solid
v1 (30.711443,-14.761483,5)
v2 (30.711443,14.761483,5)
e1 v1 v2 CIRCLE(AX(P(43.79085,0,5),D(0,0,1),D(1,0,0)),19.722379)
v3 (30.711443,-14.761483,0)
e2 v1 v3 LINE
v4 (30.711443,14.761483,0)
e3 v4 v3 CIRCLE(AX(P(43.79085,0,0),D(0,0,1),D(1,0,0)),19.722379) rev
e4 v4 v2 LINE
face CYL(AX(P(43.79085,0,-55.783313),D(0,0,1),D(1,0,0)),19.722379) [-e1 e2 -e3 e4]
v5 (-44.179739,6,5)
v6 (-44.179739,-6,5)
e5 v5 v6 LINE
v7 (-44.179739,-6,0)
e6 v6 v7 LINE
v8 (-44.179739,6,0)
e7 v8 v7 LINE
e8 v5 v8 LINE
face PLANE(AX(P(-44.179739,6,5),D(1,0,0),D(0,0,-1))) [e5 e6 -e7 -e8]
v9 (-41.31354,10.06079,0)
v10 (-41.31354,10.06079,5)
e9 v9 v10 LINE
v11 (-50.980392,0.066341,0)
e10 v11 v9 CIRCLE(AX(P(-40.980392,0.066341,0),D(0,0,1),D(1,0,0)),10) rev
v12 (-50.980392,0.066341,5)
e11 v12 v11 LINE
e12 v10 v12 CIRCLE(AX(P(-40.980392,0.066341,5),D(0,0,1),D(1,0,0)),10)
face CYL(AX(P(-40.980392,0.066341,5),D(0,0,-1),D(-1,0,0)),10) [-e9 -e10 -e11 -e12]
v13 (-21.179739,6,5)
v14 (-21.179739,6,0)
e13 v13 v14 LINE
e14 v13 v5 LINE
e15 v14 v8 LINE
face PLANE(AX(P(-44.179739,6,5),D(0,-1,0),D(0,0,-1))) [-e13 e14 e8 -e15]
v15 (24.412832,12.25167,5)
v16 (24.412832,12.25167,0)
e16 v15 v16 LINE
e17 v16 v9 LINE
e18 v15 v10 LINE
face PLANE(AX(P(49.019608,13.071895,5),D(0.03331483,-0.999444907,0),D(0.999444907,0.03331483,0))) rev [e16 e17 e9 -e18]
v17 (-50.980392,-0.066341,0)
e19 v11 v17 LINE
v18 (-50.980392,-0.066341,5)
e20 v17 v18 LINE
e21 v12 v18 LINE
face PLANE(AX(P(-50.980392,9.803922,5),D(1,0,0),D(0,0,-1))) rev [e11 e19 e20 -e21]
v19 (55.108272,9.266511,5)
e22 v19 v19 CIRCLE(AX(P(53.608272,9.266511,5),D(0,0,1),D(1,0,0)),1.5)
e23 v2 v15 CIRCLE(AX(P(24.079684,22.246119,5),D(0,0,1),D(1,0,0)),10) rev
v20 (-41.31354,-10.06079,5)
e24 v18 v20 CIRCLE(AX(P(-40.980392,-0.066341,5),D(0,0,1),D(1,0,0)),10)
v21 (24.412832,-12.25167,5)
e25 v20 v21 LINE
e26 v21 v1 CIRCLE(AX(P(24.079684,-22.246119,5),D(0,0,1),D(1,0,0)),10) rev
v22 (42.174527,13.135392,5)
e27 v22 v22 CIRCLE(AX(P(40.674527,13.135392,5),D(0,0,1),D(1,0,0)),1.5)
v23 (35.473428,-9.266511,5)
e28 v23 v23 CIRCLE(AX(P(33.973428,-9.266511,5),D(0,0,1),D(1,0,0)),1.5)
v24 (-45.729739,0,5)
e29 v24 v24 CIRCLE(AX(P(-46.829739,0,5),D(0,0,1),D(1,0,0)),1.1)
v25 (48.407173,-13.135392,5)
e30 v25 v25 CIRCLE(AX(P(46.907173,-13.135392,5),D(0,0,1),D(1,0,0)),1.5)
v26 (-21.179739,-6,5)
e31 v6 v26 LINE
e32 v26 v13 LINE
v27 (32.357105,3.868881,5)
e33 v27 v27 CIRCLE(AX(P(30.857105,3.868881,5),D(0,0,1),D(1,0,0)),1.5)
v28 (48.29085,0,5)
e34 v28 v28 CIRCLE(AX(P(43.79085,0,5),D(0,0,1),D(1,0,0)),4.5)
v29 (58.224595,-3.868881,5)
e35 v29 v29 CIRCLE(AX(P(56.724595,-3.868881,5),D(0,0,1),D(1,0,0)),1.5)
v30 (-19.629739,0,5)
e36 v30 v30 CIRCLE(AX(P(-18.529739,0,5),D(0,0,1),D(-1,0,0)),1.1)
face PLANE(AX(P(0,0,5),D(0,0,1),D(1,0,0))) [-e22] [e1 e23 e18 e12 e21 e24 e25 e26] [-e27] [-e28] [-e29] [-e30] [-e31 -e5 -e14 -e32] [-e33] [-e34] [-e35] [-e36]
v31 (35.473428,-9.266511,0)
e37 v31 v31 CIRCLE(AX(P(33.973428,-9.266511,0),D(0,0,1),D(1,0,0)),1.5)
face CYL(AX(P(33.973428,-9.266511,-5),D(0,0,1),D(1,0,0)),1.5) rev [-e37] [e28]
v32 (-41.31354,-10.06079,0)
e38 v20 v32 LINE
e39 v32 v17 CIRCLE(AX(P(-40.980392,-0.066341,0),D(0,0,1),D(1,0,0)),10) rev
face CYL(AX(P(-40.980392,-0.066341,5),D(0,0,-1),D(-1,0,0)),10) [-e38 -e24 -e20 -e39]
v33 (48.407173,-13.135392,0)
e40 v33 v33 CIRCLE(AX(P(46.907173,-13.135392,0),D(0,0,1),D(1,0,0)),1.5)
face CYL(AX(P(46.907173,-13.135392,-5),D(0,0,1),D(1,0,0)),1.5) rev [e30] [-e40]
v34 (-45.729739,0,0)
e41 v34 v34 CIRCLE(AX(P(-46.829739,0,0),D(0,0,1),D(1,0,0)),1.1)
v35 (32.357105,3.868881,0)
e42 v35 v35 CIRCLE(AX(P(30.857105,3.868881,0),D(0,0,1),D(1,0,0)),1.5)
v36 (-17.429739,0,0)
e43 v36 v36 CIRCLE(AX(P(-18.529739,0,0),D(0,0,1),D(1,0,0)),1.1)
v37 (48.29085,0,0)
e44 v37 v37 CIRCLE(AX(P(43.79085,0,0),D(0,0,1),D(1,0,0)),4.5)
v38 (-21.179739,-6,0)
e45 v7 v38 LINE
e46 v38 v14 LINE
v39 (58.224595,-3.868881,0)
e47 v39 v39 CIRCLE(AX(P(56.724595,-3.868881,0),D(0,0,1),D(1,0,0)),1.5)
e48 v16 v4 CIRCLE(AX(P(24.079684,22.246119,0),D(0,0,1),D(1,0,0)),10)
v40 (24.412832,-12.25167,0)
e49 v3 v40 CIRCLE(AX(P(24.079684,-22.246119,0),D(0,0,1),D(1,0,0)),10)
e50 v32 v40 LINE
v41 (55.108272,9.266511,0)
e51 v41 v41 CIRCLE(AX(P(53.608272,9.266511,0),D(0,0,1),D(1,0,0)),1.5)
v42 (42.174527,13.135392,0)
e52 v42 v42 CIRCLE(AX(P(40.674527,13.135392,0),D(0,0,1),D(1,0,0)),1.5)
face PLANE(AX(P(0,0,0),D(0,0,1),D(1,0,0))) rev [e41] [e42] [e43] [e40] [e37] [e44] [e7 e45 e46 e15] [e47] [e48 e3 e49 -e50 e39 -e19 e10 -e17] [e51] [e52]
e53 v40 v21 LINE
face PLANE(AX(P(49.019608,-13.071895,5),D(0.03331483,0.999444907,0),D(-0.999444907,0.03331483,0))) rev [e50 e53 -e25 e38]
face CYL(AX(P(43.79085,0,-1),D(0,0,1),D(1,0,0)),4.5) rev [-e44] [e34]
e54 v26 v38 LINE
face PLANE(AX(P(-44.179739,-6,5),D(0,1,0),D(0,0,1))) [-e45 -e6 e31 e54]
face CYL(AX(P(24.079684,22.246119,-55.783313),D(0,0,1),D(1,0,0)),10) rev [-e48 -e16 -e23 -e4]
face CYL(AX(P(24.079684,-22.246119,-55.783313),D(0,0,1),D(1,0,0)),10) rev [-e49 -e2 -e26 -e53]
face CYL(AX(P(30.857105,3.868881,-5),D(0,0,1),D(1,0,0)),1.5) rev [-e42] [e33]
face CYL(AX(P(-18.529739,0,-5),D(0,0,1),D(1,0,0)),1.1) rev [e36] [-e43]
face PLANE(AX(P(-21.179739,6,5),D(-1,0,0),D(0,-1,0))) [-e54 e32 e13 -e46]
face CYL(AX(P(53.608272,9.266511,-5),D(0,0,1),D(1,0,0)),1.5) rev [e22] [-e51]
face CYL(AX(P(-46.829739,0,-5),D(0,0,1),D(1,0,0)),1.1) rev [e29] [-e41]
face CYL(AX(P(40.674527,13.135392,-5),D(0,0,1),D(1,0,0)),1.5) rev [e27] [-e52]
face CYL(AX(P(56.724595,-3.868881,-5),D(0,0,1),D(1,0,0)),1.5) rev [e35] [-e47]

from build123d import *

# Parameters (mm, degrees)
SKETCH1_R           = 1.960784314
SKETCH1_W           = 23
SKETCH1_H           = 12
BOSS_EXTRUDE1_DEPTH = 5
FILLET2_R           = 20
SKETCH3_R           = 19.722379498
SKETCH3_R_2         = 3
BOSS_EXTRUDE2_DEPTH = 5
FILLET3_R           = 10
SKETCH6_R           = 4.5
CUT_EXTRUDE3_DEPTH  = 6
SKETCH7_R           = 1.5
SKETCH7_R_2         = 4.5
CUT_EXTRUDE4_DEPTH  = 10
SKETCH9_R           = 1.1
CUT_EXTRUDE6_DEPTH  = 10


with BuildPart() as part:
    # Sketch1 → Boss-Extrude1 (new body)
    with BuildSketch(Plane.XY):
        Polygon((49.019607843, 13.071895425), (49.019607843, -13.071895425), (-49.019607843, -9.803921569), (-50.980392157, -9.803921569), (-50.980392157, 9.803921569), (-49.019607843, 9.803921569), align=None)
        with Locations((43.790849673, 0)):
            Circle(SKETCH1_R, mode=Mode.SUBTRACT)
        with Locations((-32.679738562, 0)):
            Rectangle(SKETCH1_W, SKETCH1_H, mode=Mode.SUBTRACT)
    extrude(amount=BOSS_EXTRUDE1_DEPTH)

    # Fillet2
    # the kernel refuses this fillet: 20 mm, written as the material it takes off along each edge
    with BuildSketch(Plane(origin=(49.019607843, -13.071895425, -51.694436733), x_dir=(0, 1, 0), z_dir=(0, 0, 1))) as fillet2_piece_1:
        with BuildLine():
            CenterArc((FILLET2_R * 1.03388873465, FILLET2_R), FILLET2_R, 178.090847567, 91.909152433)
            Line((FILLET2_R * 0.0344438276744, FILLET2_R * 1.03331483023), (0, 0))
            Line((0, 0), (FILLET2_R * 1.03388873465, 0))
        make_face()
    extrude(amount=108.388873465, mode=Mode.SUBTRACT)
    with BuildSketch(Plane(origin=(49.019607843, 13.071895425, -51.694436733), x_dir=(0, -1, 0), z_dir=(0, 0, 1))) as fillet2_piece_2:
        with BuildLine():
            CenterArc((FILLET2_R * 1.03388873465, -FILLET2_R), FILLET2_R, 90, 91.909152433)
            Line((FILLET2_R * 0.0344438276744, -FILLET2_R * 1.03331483023), (0, 0))
            Line((0, 0), (FILLET2_R * 1.03388873465, 0))
        make_face()
    extrude(amount=108.388873465, mode=Mode.SUBTRACT)

    # Sketch3 → Boss-Extrude2 (add)
    with BuildSketch(Plane.XY.offset(5)):
        with Locations((43.790849673, 0)):
            Circle(SKETCH3_R)
        with Locations((43.790849673, 0)):
            Circle(SKETCH3_R_2, mode=Mode.SUBTRACT)
    extrude(amount=-BOSS_EXTRUDE2_DEPTH)

    # Fillet3
    fillet3_edges = [part.edges().sort_by_distance(p)[0] for p in [
        (-50.980392157, 9.803921569, 2.5),
        (-50.980392157, -9.803921569, 2.5),
        (28.442748303, -12.385799828, 2.5),
        (28.442748303, 12.385799828, 2.5),
    ]]
    fillet(fillet3_edges, radius=FILLET3_R)

    # Sketch6 → Cut-Extrude3 (cut)
    with BuildSketch(Plane.XY.offset(5)):
        with Locations((43.790849673, 0)):
            Circle(SKETCH6_R)
    extrude(amount=-CUT_EXTRUDE3_DEPTH, mode=Mode.SUBTRACT)

    # Sketch7 → Cut-Extrude4 (cut)
    with BuildSketch(Plane.XY.offset(5)):
        with Locations((53.608271623, 9.266511008)):
            Circle(SKETCH7_R)
        with Locations((43.790849673, 0)):
            Circle(SKETCH7_R_2)
        with Locations((56.724594586, -3.868881304)):
            Circle(SKETCH7_R)
        with Locations((46.907172636, -13.135392312)):
            Circle(SKETCH7_R)
        with Locations((33.973427724, -9.266511008)):
            Circle(SKETCH7_R)
        with Locations((30.857104761, 3.868881304)):
            Circle(SKETCH7_R)
        with Locations((40.67452671, 13.135392312)):
            Circle(SKETCH7_R)
    extrude(amount=-CUT_EXTRUDE4_DEPTH, mode=Mode.SUBTRACT)

    # Sketch9 → Cut-Extrude6 (cut)
    with BuildSketch(Plane.XY.offset(5)):
        with Locations((-46.829738562, 0)):
            Circle(SKETCH9_R)
        with Locations((-18.529738562, 0)):
            Circle(SKETCH9_R)
    extrude(amount=-CUT_EXTRUDE6_DEPTH, mode=Mode.SUBTRACT)


solid = part.part
